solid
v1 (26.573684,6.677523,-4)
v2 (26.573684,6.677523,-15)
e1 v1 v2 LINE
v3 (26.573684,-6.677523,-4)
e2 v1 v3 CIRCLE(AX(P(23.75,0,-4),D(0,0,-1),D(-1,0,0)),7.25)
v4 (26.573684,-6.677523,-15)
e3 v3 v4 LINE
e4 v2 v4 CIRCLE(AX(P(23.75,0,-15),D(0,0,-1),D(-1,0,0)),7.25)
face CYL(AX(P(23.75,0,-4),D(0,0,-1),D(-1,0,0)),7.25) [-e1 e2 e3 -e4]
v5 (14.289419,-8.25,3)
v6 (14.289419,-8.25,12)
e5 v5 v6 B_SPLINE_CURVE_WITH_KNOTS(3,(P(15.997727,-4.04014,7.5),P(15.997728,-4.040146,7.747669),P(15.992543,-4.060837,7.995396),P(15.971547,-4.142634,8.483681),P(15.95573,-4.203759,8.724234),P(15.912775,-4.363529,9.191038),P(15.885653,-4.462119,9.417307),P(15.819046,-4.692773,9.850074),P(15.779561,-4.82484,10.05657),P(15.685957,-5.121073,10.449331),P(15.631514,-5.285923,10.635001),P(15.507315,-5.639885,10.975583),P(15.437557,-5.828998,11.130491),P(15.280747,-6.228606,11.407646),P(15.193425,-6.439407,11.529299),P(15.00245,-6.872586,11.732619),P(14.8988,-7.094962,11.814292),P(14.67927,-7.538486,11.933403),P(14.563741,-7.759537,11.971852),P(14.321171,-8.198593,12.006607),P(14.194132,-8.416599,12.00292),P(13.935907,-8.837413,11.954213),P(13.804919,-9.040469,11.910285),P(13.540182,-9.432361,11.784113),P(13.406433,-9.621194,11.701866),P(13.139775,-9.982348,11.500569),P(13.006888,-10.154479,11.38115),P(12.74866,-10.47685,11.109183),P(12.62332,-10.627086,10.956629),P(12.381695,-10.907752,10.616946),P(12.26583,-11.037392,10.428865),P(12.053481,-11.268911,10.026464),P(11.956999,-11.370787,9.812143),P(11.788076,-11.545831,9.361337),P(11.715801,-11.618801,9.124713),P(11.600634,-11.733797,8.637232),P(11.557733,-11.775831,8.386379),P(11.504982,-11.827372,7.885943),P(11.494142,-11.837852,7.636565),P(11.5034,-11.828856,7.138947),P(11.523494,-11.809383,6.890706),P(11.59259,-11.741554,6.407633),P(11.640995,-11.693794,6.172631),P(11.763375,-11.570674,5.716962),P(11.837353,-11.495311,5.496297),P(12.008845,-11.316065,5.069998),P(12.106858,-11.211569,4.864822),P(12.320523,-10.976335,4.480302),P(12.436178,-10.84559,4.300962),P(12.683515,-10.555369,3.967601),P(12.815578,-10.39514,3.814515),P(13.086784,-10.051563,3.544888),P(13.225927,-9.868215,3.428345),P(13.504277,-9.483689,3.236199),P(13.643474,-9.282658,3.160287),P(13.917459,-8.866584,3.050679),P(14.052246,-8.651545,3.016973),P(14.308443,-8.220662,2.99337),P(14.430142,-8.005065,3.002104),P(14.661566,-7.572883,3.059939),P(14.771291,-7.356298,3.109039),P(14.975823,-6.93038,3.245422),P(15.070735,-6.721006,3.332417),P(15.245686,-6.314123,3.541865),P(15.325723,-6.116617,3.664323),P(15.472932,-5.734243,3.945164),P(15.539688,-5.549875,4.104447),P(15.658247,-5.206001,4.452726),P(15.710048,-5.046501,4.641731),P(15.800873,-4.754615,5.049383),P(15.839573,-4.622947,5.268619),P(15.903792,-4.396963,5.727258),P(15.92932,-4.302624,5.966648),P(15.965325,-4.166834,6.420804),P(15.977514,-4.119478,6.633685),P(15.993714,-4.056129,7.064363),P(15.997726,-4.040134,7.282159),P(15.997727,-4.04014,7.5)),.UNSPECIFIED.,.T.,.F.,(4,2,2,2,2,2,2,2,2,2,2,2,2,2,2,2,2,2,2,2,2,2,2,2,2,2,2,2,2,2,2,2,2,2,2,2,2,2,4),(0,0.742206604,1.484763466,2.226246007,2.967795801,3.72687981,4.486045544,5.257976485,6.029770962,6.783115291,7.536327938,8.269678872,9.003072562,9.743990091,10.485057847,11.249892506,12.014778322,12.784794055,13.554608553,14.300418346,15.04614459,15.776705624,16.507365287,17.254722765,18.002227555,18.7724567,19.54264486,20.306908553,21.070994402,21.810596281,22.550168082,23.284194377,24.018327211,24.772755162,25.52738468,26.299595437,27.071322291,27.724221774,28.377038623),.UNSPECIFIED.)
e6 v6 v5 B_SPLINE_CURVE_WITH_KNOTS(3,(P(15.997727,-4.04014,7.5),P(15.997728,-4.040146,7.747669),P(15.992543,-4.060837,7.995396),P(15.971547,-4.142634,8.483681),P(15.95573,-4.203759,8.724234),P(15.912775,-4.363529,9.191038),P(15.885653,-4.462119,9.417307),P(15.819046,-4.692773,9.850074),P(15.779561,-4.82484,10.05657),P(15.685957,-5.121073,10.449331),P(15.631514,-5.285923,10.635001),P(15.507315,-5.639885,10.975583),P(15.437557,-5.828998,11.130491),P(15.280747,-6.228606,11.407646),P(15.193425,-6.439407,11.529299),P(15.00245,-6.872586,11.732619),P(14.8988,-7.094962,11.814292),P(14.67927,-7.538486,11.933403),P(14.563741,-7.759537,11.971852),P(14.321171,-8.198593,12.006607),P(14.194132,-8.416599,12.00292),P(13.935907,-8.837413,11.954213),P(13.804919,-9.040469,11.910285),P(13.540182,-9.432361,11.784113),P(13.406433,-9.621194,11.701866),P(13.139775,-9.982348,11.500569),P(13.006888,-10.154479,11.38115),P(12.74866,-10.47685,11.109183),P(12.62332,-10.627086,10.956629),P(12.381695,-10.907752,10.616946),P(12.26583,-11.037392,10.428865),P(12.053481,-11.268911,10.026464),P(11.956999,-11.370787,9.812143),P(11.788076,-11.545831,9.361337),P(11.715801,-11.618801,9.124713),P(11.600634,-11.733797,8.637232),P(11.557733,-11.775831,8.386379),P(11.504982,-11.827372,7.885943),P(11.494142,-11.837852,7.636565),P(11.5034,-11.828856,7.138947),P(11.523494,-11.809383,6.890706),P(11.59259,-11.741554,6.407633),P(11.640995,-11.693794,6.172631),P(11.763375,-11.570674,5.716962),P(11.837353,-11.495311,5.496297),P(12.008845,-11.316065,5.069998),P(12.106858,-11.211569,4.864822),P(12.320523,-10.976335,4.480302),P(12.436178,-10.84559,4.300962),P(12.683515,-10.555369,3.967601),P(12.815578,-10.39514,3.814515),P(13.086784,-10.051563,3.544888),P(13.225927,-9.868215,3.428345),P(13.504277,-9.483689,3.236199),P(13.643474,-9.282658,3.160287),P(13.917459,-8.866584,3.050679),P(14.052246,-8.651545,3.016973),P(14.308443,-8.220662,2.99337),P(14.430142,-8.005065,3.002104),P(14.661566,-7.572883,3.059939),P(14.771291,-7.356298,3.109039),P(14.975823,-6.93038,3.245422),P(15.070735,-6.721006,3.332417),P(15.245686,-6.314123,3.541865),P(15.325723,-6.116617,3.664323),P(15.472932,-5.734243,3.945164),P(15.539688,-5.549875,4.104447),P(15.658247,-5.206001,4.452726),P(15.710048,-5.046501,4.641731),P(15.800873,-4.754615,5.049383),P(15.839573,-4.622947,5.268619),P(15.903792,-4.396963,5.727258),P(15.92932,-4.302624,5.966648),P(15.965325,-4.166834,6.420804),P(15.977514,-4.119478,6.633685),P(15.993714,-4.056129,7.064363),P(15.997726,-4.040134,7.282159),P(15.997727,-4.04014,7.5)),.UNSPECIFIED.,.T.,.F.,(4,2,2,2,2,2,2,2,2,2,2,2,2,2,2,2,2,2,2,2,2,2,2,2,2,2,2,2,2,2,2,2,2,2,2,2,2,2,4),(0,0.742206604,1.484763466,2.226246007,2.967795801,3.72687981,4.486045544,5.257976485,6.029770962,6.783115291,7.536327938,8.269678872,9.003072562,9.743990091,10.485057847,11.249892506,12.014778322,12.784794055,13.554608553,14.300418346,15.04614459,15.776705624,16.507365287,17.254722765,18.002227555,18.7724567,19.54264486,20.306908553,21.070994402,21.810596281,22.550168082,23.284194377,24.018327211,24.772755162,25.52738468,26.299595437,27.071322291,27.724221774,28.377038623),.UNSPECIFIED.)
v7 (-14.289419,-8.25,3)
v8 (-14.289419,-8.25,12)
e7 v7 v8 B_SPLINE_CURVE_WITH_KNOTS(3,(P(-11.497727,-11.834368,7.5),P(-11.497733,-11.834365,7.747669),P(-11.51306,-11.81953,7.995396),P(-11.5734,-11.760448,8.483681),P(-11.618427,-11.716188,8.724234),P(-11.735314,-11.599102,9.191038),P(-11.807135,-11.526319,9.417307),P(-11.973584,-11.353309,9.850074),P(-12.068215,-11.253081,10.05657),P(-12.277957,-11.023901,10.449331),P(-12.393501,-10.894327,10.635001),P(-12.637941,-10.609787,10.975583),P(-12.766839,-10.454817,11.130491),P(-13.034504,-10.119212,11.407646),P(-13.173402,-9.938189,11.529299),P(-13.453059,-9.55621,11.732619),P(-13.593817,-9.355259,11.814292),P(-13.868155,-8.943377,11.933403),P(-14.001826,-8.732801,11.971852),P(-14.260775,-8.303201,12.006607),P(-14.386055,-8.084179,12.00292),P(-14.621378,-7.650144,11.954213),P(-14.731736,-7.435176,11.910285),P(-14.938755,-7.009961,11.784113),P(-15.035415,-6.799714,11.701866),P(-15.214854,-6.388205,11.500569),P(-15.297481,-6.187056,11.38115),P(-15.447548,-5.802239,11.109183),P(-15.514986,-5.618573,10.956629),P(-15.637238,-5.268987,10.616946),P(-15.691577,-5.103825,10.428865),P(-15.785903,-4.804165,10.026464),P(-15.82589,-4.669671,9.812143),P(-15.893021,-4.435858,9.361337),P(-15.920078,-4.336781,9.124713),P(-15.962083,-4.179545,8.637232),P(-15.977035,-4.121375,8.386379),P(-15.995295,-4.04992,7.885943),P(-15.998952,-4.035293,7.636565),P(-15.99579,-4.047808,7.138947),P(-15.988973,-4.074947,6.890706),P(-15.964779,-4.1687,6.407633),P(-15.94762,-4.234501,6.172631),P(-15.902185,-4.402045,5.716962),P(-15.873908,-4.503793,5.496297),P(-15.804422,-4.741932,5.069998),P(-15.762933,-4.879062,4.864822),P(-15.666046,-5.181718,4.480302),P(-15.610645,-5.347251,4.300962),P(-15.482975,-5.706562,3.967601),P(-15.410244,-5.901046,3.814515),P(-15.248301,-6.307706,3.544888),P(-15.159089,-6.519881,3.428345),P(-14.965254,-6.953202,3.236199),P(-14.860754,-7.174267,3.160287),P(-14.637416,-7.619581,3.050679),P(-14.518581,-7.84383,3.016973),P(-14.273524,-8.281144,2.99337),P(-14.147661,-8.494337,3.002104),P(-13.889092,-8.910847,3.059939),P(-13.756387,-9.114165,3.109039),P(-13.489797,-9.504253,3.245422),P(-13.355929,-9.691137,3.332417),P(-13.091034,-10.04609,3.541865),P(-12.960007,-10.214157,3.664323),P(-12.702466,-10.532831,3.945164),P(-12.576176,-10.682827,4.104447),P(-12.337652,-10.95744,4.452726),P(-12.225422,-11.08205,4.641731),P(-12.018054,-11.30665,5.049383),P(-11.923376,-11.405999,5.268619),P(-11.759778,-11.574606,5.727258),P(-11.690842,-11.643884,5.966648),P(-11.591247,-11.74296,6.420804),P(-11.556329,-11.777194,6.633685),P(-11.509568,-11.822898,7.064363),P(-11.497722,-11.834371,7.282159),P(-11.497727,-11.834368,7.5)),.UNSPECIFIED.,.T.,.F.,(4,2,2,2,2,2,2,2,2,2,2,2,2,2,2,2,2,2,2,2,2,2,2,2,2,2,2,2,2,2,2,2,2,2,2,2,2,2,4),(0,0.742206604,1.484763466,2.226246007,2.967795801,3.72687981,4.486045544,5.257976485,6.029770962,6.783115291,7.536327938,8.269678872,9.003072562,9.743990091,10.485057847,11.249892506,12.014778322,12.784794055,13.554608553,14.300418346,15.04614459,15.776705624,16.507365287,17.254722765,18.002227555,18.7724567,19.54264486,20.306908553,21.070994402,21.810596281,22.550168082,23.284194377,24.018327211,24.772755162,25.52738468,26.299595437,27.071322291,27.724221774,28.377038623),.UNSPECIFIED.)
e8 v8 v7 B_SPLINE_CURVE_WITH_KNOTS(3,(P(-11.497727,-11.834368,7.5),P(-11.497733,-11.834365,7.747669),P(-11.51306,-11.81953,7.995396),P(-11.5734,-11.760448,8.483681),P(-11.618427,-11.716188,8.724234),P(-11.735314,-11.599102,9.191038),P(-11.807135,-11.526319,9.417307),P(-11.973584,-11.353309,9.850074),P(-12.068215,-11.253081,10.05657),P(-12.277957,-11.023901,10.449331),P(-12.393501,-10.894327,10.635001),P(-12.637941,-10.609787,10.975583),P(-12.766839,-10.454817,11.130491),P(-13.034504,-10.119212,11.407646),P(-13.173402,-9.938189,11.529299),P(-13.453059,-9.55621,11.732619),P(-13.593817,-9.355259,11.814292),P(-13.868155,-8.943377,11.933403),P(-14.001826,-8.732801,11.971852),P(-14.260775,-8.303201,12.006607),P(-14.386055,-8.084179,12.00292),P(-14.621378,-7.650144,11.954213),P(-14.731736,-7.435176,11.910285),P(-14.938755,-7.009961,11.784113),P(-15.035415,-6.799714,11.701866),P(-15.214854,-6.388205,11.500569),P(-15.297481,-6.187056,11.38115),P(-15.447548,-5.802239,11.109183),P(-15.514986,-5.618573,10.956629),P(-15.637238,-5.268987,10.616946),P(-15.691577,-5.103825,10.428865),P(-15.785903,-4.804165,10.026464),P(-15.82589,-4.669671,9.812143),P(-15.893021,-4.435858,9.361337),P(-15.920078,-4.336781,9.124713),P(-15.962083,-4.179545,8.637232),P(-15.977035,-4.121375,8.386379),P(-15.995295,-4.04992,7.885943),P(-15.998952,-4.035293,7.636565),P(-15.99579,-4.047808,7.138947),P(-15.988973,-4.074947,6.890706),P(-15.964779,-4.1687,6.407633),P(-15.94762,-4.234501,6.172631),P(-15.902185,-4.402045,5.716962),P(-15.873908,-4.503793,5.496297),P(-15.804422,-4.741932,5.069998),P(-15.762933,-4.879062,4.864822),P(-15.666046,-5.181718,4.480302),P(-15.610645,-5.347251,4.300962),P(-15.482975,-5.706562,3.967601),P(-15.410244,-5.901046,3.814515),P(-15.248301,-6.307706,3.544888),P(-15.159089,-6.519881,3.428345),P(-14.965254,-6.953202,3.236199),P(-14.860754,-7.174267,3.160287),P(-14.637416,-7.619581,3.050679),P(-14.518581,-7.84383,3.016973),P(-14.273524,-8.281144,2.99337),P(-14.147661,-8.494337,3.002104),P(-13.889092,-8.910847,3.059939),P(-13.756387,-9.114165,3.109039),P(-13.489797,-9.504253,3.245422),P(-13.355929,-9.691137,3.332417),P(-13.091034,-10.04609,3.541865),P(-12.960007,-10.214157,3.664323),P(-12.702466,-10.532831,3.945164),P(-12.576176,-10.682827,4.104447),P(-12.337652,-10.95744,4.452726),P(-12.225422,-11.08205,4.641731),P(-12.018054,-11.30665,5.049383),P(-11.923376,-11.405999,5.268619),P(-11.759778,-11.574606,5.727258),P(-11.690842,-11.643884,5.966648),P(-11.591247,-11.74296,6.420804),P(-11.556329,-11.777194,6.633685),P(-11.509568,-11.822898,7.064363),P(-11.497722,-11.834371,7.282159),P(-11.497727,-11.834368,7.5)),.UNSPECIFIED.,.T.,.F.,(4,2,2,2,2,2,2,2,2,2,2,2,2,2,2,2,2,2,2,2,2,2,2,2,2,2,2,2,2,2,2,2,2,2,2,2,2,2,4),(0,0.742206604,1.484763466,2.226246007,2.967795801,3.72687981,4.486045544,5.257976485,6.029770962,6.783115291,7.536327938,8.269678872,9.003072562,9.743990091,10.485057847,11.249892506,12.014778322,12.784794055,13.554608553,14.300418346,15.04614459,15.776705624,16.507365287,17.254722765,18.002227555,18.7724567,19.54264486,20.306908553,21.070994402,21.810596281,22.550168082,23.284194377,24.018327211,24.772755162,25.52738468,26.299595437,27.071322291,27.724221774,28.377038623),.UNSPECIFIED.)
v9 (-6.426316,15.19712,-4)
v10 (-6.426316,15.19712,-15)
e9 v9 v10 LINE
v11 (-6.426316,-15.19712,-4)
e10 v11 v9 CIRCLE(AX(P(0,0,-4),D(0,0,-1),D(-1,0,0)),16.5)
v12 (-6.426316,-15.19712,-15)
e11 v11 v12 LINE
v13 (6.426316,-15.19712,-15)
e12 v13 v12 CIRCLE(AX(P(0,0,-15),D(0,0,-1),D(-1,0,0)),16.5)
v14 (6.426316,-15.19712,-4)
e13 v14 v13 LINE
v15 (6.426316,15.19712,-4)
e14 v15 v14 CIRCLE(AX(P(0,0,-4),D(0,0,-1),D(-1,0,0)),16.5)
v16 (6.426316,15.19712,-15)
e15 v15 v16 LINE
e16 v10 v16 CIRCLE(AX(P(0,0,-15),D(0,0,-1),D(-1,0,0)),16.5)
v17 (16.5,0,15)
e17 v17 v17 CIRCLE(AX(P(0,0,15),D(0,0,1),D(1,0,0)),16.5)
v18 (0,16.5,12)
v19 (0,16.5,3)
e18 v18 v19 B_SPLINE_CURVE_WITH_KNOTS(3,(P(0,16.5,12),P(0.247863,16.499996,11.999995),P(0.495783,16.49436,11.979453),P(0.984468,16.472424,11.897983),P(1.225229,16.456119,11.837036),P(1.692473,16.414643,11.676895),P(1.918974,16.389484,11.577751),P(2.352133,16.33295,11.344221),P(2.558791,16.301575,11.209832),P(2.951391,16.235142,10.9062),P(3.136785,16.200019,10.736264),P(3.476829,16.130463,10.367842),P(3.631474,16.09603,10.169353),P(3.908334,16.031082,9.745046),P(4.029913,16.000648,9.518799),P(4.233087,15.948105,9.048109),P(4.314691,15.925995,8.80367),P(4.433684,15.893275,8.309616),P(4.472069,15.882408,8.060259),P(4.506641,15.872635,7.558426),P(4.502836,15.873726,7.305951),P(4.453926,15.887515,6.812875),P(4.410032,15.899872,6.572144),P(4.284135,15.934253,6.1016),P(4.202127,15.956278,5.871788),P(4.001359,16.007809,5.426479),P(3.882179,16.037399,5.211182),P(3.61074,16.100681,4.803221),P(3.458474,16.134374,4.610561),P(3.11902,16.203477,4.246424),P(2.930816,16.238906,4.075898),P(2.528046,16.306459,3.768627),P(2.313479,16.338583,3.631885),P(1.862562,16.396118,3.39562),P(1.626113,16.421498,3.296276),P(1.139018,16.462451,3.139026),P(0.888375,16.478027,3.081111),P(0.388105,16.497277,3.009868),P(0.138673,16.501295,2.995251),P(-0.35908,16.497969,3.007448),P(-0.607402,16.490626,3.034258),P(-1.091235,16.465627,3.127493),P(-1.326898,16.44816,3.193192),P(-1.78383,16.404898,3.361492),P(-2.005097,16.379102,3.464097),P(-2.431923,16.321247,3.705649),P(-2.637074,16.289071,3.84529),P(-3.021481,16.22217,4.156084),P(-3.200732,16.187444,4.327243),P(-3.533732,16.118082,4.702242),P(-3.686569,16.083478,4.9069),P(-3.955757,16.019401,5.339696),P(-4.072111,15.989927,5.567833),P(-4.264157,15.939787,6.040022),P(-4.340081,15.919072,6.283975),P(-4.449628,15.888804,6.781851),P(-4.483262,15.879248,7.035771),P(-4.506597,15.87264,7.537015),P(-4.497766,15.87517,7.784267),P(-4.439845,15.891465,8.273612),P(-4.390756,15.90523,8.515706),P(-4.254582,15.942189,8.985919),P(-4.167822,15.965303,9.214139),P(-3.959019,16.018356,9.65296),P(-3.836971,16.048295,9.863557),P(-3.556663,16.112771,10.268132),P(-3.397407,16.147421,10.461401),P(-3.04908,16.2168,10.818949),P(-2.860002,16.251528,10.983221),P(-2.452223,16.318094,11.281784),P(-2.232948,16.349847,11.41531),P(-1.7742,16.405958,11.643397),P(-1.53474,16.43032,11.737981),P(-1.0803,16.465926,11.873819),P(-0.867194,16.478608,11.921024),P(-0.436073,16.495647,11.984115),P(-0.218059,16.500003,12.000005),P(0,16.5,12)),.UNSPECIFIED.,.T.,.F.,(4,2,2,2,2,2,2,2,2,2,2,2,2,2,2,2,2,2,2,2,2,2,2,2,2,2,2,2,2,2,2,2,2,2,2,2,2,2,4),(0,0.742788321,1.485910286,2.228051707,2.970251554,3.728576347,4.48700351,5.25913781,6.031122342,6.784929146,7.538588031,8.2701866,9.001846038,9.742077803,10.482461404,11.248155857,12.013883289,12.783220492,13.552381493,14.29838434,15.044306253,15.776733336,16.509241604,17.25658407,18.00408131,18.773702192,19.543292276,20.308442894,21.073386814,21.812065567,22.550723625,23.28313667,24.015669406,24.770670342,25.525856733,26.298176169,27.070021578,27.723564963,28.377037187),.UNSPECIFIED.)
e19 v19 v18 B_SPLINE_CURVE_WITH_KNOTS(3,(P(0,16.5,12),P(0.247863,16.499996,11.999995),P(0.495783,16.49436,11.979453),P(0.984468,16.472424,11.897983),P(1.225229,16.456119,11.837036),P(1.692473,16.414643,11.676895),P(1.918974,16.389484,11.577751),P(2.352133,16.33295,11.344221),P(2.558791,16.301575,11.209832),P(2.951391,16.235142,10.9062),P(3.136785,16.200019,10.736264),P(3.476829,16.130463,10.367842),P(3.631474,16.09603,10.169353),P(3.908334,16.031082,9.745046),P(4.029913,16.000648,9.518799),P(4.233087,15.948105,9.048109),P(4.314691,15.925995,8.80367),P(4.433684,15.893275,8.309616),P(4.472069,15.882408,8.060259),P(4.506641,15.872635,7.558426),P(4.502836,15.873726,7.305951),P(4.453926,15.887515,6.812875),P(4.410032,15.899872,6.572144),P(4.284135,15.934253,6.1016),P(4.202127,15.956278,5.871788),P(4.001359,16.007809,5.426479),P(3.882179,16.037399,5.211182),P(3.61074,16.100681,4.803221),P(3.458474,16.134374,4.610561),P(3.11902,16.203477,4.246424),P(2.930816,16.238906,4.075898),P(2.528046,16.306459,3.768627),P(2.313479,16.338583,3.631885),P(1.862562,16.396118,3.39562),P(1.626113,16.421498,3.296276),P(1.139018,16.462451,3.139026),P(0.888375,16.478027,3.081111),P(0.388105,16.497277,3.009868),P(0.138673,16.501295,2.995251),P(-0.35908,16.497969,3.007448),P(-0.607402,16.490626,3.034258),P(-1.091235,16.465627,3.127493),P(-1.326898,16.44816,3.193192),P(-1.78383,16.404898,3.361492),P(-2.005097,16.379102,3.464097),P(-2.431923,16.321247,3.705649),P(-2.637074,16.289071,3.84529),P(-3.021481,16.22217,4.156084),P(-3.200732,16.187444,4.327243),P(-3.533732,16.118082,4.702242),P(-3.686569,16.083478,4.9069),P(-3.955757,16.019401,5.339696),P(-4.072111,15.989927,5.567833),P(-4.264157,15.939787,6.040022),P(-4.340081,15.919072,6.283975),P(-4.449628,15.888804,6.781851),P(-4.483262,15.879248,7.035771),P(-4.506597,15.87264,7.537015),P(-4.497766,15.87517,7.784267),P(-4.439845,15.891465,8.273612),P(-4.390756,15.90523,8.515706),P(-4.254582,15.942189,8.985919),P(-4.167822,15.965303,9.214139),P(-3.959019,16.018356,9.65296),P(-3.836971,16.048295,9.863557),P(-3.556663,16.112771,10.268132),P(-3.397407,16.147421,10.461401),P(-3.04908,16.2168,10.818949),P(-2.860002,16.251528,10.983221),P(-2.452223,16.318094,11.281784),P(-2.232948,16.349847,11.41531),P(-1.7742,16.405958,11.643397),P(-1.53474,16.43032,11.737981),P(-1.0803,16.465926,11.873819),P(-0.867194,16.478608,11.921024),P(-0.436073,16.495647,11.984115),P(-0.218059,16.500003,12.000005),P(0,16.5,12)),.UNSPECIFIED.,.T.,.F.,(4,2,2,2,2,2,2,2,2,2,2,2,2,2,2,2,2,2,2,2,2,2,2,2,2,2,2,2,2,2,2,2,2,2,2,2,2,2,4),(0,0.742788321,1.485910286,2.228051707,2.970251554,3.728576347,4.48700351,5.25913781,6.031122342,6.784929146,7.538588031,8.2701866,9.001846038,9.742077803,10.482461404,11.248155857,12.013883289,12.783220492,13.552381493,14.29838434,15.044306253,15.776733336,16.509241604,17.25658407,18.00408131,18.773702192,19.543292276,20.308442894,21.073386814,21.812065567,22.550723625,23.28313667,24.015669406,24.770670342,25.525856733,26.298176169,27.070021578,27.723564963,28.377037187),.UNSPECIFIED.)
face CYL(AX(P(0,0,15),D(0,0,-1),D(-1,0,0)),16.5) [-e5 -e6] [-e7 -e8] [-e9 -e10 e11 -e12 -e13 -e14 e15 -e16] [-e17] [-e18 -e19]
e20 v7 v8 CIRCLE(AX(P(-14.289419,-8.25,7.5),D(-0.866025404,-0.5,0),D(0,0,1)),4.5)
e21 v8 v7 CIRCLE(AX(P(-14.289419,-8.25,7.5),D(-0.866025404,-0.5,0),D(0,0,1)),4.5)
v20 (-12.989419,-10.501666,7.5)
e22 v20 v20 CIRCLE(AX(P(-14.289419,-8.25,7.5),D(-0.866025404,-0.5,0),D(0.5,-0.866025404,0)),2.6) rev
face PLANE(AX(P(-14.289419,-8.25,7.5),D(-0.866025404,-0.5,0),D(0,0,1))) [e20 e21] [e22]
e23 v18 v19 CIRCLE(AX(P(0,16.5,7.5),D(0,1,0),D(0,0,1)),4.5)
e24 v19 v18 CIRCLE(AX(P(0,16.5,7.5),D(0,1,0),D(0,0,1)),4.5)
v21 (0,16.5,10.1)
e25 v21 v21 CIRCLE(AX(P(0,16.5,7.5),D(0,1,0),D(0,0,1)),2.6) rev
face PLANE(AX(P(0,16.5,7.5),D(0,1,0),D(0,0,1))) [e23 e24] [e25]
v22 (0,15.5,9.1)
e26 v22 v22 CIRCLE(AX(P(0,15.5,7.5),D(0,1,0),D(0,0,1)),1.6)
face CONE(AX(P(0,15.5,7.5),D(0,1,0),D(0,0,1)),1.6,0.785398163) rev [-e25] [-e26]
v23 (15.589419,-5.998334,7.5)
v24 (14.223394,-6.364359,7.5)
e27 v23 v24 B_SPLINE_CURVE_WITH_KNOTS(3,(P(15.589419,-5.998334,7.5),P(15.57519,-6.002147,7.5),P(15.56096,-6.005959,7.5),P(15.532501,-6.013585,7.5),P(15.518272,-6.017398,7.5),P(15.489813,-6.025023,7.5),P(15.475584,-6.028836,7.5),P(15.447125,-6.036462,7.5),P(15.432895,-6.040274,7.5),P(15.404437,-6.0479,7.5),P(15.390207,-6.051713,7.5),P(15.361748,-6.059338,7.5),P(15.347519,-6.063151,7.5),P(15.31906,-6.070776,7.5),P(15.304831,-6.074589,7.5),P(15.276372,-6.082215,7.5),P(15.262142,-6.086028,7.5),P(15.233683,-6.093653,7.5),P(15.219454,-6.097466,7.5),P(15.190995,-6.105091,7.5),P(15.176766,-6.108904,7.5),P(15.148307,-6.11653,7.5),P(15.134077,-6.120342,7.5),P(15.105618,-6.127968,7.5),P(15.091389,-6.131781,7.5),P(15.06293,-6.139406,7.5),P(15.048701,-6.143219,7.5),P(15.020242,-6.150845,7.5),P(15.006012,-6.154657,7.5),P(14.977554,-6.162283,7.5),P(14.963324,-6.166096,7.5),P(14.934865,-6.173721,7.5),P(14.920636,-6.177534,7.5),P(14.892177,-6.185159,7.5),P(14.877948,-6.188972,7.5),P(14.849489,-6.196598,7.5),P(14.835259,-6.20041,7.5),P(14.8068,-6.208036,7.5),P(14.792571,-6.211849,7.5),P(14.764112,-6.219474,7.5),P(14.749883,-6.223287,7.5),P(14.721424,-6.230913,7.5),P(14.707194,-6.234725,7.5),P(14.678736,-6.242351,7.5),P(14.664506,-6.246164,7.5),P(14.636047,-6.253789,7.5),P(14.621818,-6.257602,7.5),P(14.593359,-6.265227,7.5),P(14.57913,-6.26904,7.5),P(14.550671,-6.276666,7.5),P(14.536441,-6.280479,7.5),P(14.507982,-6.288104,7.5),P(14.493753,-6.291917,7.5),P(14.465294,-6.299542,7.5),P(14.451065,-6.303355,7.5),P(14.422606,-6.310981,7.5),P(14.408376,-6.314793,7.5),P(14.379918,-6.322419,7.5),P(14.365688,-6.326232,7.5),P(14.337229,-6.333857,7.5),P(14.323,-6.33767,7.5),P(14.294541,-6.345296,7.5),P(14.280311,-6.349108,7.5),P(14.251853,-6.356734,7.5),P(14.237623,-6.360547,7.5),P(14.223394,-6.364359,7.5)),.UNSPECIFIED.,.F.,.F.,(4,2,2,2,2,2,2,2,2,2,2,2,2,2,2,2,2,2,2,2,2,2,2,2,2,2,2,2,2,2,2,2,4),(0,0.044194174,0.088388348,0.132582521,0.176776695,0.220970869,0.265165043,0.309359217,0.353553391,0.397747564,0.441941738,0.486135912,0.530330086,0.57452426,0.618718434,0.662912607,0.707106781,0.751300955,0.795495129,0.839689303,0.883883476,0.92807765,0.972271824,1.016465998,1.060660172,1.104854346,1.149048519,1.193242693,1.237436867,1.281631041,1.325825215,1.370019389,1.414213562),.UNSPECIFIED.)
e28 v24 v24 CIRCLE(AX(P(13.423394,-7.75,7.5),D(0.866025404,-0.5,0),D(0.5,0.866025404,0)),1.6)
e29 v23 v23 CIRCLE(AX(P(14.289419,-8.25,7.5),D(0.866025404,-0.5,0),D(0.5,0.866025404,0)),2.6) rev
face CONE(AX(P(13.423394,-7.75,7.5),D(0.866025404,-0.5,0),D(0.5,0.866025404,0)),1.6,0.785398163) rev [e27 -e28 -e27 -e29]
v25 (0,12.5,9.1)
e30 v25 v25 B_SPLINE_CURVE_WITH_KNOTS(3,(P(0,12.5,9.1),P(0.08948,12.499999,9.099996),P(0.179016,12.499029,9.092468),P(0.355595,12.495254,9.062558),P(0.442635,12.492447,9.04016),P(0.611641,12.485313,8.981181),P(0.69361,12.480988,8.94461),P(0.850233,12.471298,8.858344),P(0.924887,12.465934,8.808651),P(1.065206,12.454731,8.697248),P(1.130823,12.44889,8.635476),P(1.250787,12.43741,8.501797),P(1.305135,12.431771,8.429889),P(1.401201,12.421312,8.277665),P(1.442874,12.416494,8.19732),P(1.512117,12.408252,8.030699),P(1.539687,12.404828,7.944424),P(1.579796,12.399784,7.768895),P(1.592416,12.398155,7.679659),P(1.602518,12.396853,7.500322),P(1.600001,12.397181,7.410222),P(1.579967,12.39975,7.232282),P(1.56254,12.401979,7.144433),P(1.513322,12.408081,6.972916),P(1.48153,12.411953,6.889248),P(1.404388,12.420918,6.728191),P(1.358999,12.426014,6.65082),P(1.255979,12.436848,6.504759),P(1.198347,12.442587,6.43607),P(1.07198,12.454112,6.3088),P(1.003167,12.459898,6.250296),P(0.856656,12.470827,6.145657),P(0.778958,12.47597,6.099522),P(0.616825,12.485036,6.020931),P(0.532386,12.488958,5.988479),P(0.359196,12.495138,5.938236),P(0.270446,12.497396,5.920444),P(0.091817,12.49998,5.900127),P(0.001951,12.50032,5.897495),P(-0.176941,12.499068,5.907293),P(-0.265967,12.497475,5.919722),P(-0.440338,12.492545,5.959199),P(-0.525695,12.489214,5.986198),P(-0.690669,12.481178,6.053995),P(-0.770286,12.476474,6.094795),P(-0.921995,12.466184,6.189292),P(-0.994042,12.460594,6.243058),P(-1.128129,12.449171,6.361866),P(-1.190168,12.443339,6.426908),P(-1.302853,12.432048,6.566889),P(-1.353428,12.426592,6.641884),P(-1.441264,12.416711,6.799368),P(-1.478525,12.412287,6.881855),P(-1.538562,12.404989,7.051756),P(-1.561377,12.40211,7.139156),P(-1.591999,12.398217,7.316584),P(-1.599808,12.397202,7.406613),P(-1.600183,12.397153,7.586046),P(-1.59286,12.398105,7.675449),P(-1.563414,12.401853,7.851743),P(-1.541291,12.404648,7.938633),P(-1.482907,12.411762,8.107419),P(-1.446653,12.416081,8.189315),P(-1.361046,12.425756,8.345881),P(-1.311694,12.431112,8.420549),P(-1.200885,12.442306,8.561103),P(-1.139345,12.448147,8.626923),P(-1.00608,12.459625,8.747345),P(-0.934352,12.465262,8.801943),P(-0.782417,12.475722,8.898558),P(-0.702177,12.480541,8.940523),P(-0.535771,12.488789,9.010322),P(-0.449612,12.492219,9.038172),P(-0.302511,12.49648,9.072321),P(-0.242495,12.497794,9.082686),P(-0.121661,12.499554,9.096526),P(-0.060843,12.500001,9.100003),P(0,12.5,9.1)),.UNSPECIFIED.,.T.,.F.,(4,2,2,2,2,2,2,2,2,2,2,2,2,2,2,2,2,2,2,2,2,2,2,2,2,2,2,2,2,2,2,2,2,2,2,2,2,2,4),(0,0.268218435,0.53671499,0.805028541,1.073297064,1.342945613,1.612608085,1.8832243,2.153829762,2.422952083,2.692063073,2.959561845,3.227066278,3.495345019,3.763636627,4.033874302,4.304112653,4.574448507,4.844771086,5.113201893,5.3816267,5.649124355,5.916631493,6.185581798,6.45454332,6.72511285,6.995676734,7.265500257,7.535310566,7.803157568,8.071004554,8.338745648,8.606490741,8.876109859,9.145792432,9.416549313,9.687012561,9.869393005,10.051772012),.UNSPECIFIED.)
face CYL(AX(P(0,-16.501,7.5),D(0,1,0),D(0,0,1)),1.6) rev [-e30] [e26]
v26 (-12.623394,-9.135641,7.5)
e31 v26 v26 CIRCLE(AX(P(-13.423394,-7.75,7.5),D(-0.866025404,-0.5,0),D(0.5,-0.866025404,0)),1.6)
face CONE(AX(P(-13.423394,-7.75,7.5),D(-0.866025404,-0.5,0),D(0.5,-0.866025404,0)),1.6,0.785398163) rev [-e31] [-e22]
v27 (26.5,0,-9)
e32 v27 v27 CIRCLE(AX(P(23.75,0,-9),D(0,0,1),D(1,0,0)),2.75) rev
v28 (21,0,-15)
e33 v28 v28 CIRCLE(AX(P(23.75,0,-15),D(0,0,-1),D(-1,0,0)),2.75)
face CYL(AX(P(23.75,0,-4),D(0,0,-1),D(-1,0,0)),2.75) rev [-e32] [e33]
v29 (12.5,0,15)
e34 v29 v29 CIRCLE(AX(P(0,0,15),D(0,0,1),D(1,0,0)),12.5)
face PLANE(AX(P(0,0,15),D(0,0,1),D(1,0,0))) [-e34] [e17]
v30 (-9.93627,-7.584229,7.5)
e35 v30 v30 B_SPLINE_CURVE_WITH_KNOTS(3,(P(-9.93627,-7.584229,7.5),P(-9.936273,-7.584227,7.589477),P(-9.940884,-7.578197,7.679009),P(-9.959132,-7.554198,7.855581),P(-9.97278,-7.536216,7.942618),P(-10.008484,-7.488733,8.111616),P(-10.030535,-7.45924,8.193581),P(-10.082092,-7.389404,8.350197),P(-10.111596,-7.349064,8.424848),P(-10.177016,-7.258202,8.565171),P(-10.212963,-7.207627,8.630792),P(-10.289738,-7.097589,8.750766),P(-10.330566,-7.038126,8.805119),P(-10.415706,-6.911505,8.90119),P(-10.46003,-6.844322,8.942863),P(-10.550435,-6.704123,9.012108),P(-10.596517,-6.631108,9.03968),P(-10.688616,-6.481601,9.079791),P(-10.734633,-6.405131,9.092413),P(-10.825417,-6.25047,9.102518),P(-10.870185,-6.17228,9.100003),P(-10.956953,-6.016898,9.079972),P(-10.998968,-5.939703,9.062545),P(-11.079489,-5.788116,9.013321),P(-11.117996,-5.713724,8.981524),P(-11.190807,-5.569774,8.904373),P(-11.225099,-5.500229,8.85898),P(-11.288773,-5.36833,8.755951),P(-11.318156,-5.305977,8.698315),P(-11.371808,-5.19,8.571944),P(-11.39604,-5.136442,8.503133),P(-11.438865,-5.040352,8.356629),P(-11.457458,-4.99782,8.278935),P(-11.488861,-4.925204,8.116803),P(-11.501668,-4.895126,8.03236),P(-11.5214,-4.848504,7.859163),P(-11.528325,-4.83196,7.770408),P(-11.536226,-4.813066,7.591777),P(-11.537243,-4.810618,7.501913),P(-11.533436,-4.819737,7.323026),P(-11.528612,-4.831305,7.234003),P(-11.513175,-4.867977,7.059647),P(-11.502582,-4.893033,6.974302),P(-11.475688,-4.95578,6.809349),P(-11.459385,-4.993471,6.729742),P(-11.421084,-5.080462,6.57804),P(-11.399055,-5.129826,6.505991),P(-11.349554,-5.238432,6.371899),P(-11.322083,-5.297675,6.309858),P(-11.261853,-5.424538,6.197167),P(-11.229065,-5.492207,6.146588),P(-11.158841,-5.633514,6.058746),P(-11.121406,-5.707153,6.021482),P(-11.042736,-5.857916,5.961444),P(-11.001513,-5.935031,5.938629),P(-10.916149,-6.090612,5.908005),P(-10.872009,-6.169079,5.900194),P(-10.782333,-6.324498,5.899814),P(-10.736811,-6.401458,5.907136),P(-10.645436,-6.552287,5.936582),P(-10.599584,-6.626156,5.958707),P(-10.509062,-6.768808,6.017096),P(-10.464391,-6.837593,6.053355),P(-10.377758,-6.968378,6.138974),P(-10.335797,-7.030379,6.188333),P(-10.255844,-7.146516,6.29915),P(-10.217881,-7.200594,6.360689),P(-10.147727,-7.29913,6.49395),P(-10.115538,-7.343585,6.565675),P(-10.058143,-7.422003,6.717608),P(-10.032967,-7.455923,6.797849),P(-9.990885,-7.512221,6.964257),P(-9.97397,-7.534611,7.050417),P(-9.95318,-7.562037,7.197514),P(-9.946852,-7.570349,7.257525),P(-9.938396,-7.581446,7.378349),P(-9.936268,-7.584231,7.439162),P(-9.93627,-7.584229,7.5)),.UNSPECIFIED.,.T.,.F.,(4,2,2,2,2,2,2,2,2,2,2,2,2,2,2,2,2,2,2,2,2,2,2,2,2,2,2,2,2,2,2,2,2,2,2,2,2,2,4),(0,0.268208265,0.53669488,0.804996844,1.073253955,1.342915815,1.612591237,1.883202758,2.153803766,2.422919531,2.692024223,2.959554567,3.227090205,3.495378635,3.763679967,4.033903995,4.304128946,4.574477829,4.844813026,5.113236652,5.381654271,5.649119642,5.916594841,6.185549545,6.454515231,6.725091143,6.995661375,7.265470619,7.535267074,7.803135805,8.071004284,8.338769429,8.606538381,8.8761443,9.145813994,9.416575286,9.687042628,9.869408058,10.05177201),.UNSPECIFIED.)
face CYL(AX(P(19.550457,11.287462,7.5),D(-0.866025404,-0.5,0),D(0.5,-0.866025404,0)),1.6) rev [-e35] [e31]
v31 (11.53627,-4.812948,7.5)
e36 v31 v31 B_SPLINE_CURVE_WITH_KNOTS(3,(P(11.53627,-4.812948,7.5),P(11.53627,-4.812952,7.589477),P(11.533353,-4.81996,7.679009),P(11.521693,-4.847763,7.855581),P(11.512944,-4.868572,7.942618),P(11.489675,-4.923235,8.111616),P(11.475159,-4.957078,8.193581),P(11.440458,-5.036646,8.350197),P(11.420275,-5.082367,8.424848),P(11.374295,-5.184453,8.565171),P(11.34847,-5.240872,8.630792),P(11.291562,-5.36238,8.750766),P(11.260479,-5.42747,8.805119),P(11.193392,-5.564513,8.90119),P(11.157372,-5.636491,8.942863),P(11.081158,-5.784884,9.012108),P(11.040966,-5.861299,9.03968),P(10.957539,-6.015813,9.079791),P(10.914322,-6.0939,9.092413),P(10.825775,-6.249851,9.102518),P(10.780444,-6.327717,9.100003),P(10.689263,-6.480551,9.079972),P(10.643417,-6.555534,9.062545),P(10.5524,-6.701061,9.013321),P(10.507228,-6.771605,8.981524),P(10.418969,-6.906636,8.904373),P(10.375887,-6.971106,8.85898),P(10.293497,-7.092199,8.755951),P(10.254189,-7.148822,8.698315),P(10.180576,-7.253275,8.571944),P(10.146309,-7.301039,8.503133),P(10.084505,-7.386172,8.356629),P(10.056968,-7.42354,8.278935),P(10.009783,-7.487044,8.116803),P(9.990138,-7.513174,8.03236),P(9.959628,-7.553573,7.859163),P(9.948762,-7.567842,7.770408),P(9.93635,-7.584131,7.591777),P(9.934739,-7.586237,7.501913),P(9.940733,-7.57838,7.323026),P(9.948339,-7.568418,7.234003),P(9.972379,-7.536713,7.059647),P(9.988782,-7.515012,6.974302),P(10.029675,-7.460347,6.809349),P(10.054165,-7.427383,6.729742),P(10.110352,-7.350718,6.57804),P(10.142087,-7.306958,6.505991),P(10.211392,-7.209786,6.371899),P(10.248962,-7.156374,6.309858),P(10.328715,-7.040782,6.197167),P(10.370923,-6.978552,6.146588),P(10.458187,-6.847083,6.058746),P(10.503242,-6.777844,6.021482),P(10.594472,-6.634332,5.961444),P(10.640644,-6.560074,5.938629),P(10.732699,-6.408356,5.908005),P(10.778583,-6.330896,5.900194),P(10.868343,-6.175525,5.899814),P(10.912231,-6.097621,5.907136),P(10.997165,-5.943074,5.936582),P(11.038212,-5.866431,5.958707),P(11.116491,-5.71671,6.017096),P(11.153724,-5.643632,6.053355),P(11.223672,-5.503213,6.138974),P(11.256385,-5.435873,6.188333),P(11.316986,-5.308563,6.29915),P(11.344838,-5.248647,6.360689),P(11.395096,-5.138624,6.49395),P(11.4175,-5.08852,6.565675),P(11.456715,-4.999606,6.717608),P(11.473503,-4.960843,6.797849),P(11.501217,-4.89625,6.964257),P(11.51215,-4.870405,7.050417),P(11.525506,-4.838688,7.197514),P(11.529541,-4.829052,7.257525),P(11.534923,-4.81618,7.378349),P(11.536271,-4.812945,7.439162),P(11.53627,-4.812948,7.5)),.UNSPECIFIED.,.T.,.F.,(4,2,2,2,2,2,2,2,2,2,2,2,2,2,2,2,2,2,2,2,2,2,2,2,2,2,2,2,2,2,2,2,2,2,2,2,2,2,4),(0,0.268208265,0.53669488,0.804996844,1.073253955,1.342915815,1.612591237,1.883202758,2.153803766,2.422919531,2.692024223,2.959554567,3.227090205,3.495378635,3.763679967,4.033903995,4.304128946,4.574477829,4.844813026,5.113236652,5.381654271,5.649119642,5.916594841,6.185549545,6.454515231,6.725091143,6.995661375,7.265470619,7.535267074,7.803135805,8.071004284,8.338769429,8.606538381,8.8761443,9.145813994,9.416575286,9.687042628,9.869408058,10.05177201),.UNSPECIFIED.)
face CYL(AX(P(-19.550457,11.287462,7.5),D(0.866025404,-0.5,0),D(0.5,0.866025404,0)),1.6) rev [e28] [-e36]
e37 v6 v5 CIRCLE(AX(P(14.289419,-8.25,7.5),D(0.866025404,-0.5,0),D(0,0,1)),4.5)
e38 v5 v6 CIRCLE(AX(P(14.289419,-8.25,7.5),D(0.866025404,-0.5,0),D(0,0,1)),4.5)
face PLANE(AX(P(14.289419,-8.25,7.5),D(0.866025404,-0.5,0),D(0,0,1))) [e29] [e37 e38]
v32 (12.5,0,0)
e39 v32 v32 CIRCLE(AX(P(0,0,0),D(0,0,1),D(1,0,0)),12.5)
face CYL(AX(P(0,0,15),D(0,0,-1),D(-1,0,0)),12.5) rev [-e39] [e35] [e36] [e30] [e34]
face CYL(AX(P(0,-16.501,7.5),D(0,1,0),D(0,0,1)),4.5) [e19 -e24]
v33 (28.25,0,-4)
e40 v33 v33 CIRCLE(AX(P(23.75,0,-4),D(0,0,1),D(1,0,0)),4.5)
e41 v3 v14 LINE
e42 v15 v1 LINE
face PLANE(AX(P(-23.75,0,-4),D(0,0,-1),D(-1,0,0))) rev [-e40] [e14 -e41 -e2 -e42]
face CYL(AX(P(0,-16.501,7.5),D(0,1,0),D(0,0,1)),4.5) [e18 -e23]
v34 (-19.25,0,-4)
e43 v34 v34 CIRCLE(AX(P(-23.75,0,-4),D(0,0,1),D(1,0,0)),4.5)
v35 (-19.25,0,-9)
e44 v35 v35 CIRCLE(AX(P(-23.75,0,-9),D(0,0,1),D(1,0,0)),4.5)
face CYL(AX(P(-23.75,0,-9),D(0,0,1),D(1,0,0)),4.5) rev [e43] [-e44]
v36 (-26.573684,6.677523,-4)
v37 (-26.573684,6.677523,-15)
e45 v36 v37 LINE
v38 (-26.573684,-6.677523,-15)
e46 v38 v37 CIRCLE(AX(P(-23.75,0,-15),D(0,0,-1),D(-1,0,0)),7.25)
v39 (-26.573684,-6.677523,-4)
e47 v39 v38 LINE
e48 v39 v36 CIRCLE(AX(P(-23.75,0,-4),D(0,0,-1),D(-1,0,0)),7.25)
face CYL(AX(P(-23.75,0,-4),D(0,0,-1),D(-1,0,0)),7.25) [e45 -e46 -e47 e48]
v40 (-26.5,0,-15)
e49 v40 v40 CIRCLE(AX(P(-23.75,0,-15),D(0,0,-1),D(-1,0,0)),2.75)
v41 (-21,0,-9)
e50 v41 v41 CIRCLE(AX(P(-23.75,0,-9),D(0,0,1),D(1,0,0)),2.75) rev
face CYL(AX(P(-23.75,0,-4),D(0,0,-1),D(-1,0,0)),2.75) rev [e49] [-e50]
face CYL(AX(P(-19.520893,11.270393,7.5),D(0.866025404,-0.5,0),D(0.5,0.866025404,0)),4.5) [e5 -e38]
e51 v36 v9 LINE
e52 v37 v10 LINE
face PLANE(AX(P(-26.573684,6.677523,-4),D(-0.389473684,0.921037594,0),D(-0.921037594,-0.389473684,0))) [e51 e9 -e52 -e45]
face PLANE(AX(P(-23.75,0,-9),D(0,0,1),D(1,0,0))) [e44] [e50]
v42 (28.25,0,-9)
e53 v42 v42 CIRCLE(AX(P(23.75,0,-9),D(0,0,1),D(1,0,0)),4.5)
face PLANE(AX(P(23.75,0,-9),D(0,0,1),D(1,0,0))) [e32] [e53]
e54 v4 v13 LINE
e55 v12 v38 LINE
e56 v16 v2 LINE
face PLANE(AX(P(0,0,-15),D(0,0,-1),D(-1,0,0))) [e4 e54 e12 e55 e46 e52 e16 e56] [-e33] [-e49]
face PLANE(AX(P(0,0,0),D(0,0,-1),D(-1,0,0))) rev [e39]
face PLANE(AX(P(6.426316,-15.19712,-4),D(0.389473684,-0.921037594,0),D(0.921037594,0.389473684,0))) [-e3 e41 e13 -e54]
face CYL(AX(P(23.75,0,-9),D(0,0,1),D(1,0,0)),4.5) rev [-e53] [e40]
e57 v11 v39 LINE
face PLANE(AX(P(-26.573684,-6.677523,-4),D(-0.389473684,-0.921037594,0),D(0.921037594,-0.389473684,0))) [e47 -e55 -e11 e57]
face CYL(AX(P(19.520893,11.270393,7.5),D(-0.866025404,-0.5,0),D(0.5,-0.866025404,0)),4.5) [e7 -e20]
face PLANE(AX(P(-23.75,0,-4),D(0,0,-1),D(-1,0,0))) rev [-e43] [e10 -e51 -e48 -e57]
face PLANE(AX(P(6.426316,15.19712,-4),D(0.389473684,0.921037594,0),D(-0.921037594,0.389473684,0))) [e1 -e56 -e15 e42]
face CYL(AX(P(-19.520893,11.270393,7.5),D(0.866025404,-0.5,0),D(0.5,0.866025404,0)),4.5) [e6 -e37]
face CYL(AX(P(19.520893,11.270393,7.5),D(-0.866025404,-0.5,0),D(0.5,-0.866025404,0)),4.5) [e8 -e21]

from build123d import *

# Parameters (mm, degrees)
SKETCH1_R                = 16.5
SKETCH1_R_2              = 12.5
BOSS_EXTRUDE1_DEPTH      = 15
BOSS_EXTRUDE2_START      = 15
SKETCH2_R                = 16.5
BOSS_EXTRUDE2_DEPTH      = 15
BOSS_EXTRUDE3_REACH      = 41.828
BOSS_EXTRUDE3_END_RADIUS = 16.5
SKETCH3_R                = 4.5
CUT_EXTRUDE1_REACH       = 41.828
CUT_EXTRUDE1_END_RADIUS  = 12.5
SKETCH4_R                = 1.6
CIRPATTERN1_COUNT        = 3
CHAMFER1_SIZE            = 1
SKETCH5_R                = 2.75
BOSS_EXTRUDE4_DEPTH      = 11
SKETCH6_R                = 4.5
CUT_EXTRUDE2_DEPTH       = 5


with BuildPart() as part:
    # Sketch1 → Boss-Extrude1 (new body)
    with BuildSketch(Plane.XY):
        Circle(SKETCH1_R)
        Circle(SKETCH1_R_2, mode=Mode.SUBTRACT)
    extrude(amount=BOSS_EXTRUDE1_DEPTH)

    # Sketch2 → Boss-Extrude2 (add)
    with BuildSketch(Plane(origin=(0, 0, 0), x_dir=(-1, 0, 0), z_dir=(0, 0, -1)).offset(BOSS_EXTRUDE2_START)):
        Circle(SKETCH2_R)
    extrude(amount=-BOSS_EXTRUDE2_DEPTH)

    # Boss-Extrude3: up to this cylinder (the profile starts outside it)
    boss_extrude3_end = Plane(origin=(0, 0, 7.5), z_dir=(0, 0, -1)) * Cylinder(BOSS_EXTRUDE3_END_RADIUS, 117.656, mode=Mode.PRIVATE)
    # Sketch3 → Boss-Extrude3 (add, up to the surface)
    with BuildSketch(Plane(origin=(0, 16.5, 0), x_dir=(1, 0, 0), z_dir=(0, 1, 0)), mode=Mode.PRIVATE) as boss_extrude3_sk1:
        with Locations((0, -7.5)):
            Circle(SKETCH3_R)
    boss_extrude3_tool1 = extrude(boss_extrude3_sk1.sketch, amount=-BOSS_EXTRUDE3_REACH, mode=Mode.PRIVATE) - boss_extrude3_end
    boss_extrude3 = boss_extrude3_tool1.solids().sort_by_distance((0, 16.5, 7.5))[0] + boss_extrude3_tool1.solids().sort_by_distance((0, 16.5, 7.5))[1]
    add(boss_extrude3)

    # Cut-Extrude1: up to this cylinder (the profile starts outside it)
    cut_extrude1_end = Plane(origin=(0, 0, 7.5), z_dir=(0, 0, -1)) * Cylinder(CUT_EXTRUDE1_END_RADIUS, 109.656, mode=Mode.PRIVATE)
    # Sketch4 → Cut-Extrude1 (cut, up to the surface)
    with BuildSketch(Plane(origin=(0, 16.5, 0), x_dir=(1, 0, 0), z_dir=(0, 1, 0)), mode=Mode.PRIVATE) as cut_extrude1_sk1:
        with Locations((0, -7.5)):
            Circle(SKETCH4_R)
    cut_extrude1_tool1 = extrude(cut_extrude1_sk1.sketch, amount=-CUT_EXTRUDE1_REACH, mode=Mode.PRIVATE) - cut_extrude1_end
    cut_extrude1 = cut_extrude1_tool1.solids().sort_by_distance((0, 16.5, 7.5))[0]
    add(cut_extrude1, mode=Mode.SUBTRACT)

    # CirPattern1: Boss-Extrude3, Cut-Extrude1 ×3 about axis
    cirpattern1_axis = Axis((0, 0, 15), (0, 0, 1))
    add([boss_extrude3.rotate(cirpattern1_axis, i * 360 / CIRPATTERN1_COUNT) for i in range(1, CIRPATTERN1_COUNT)])
    add([cut_extrude1.rotate(cirpattern1_axis, i * 360 / CIRPATTERN1_COUNT) for i in range(1, CIRPATTERN1_COUNT)], mode=Mode.SUBTRACT)

    # Chamfer1
    chamfer1_edges = [part.edges().sort_by_distance(p)[0] for p in [
        (-13.489419162, -9.635640646, 7.5),
        (15.089419162, -6.864359354, 7.5),
        (-1.6, 16.5, 7.5),
    ]]
    chamfer(chamfer1_edges, length=CHAMFER1_SIZE)

    # Sketch5 → Boss-Extrude4 (add)
    with BuildSketch(Plane(origin=(0, 0, -15), x_dir=(-1, 0, 0), z_dir=(0, 0, -1))):
        with BuildLine():
            Line((26.573684211, 6.677522556), (6.426315789, 15.197120299))
            ThreePointArc((6.426315789, 15.197120299), (0, 16.5), (-6.426315789, 15.197120299))
            Line((-6.426315789, 15.197120299), (-26.573684211, 6.677522556))
            ThreePointArc((-26.573684211, 6.677522556), (-31, 0), (-26.573684211, -6.677522556))
            Line((-26.573684211, -6.677522556), (-6.426315789, -15.197120299))
            ThreePointArc((-6.426315789, -15.197120299), (0, -16.5), (6.426315789, -15.197120299))
            Line((6.426315789, -15.197120299), (26.573684211, -6.677522556))
            ThreePointArc((26.573684211, -6.677522556), (31, 0), (26.573684211, 6.677522556))
        make_face()
        with Locations((23.75, 0)):
            Circle(SKETCH5_R, mode=Mode.SUBTRACT)
        with Locations((-23.75, 0)):
            Circle(SKETCH5_R, mode=Mode.SUBTRACT)
    extrude(amount=-BOSS_EXTRUDE4_DEPTH)

    # Sketch6 → Cut-Extrude2 (cut)
    with BuildSketch(Plane.XY.offset(-4)):
        with Locations((-23.75, 0)):
            Circle(SKETCH6_R)
        with Locations((23.75, 0)):
            Circle(SKETCH6_R)
    extrude(amount=-CUT_EXTRUDE2_DEPTH, mode=Mode.SUBTRACT)


solid = part.part
